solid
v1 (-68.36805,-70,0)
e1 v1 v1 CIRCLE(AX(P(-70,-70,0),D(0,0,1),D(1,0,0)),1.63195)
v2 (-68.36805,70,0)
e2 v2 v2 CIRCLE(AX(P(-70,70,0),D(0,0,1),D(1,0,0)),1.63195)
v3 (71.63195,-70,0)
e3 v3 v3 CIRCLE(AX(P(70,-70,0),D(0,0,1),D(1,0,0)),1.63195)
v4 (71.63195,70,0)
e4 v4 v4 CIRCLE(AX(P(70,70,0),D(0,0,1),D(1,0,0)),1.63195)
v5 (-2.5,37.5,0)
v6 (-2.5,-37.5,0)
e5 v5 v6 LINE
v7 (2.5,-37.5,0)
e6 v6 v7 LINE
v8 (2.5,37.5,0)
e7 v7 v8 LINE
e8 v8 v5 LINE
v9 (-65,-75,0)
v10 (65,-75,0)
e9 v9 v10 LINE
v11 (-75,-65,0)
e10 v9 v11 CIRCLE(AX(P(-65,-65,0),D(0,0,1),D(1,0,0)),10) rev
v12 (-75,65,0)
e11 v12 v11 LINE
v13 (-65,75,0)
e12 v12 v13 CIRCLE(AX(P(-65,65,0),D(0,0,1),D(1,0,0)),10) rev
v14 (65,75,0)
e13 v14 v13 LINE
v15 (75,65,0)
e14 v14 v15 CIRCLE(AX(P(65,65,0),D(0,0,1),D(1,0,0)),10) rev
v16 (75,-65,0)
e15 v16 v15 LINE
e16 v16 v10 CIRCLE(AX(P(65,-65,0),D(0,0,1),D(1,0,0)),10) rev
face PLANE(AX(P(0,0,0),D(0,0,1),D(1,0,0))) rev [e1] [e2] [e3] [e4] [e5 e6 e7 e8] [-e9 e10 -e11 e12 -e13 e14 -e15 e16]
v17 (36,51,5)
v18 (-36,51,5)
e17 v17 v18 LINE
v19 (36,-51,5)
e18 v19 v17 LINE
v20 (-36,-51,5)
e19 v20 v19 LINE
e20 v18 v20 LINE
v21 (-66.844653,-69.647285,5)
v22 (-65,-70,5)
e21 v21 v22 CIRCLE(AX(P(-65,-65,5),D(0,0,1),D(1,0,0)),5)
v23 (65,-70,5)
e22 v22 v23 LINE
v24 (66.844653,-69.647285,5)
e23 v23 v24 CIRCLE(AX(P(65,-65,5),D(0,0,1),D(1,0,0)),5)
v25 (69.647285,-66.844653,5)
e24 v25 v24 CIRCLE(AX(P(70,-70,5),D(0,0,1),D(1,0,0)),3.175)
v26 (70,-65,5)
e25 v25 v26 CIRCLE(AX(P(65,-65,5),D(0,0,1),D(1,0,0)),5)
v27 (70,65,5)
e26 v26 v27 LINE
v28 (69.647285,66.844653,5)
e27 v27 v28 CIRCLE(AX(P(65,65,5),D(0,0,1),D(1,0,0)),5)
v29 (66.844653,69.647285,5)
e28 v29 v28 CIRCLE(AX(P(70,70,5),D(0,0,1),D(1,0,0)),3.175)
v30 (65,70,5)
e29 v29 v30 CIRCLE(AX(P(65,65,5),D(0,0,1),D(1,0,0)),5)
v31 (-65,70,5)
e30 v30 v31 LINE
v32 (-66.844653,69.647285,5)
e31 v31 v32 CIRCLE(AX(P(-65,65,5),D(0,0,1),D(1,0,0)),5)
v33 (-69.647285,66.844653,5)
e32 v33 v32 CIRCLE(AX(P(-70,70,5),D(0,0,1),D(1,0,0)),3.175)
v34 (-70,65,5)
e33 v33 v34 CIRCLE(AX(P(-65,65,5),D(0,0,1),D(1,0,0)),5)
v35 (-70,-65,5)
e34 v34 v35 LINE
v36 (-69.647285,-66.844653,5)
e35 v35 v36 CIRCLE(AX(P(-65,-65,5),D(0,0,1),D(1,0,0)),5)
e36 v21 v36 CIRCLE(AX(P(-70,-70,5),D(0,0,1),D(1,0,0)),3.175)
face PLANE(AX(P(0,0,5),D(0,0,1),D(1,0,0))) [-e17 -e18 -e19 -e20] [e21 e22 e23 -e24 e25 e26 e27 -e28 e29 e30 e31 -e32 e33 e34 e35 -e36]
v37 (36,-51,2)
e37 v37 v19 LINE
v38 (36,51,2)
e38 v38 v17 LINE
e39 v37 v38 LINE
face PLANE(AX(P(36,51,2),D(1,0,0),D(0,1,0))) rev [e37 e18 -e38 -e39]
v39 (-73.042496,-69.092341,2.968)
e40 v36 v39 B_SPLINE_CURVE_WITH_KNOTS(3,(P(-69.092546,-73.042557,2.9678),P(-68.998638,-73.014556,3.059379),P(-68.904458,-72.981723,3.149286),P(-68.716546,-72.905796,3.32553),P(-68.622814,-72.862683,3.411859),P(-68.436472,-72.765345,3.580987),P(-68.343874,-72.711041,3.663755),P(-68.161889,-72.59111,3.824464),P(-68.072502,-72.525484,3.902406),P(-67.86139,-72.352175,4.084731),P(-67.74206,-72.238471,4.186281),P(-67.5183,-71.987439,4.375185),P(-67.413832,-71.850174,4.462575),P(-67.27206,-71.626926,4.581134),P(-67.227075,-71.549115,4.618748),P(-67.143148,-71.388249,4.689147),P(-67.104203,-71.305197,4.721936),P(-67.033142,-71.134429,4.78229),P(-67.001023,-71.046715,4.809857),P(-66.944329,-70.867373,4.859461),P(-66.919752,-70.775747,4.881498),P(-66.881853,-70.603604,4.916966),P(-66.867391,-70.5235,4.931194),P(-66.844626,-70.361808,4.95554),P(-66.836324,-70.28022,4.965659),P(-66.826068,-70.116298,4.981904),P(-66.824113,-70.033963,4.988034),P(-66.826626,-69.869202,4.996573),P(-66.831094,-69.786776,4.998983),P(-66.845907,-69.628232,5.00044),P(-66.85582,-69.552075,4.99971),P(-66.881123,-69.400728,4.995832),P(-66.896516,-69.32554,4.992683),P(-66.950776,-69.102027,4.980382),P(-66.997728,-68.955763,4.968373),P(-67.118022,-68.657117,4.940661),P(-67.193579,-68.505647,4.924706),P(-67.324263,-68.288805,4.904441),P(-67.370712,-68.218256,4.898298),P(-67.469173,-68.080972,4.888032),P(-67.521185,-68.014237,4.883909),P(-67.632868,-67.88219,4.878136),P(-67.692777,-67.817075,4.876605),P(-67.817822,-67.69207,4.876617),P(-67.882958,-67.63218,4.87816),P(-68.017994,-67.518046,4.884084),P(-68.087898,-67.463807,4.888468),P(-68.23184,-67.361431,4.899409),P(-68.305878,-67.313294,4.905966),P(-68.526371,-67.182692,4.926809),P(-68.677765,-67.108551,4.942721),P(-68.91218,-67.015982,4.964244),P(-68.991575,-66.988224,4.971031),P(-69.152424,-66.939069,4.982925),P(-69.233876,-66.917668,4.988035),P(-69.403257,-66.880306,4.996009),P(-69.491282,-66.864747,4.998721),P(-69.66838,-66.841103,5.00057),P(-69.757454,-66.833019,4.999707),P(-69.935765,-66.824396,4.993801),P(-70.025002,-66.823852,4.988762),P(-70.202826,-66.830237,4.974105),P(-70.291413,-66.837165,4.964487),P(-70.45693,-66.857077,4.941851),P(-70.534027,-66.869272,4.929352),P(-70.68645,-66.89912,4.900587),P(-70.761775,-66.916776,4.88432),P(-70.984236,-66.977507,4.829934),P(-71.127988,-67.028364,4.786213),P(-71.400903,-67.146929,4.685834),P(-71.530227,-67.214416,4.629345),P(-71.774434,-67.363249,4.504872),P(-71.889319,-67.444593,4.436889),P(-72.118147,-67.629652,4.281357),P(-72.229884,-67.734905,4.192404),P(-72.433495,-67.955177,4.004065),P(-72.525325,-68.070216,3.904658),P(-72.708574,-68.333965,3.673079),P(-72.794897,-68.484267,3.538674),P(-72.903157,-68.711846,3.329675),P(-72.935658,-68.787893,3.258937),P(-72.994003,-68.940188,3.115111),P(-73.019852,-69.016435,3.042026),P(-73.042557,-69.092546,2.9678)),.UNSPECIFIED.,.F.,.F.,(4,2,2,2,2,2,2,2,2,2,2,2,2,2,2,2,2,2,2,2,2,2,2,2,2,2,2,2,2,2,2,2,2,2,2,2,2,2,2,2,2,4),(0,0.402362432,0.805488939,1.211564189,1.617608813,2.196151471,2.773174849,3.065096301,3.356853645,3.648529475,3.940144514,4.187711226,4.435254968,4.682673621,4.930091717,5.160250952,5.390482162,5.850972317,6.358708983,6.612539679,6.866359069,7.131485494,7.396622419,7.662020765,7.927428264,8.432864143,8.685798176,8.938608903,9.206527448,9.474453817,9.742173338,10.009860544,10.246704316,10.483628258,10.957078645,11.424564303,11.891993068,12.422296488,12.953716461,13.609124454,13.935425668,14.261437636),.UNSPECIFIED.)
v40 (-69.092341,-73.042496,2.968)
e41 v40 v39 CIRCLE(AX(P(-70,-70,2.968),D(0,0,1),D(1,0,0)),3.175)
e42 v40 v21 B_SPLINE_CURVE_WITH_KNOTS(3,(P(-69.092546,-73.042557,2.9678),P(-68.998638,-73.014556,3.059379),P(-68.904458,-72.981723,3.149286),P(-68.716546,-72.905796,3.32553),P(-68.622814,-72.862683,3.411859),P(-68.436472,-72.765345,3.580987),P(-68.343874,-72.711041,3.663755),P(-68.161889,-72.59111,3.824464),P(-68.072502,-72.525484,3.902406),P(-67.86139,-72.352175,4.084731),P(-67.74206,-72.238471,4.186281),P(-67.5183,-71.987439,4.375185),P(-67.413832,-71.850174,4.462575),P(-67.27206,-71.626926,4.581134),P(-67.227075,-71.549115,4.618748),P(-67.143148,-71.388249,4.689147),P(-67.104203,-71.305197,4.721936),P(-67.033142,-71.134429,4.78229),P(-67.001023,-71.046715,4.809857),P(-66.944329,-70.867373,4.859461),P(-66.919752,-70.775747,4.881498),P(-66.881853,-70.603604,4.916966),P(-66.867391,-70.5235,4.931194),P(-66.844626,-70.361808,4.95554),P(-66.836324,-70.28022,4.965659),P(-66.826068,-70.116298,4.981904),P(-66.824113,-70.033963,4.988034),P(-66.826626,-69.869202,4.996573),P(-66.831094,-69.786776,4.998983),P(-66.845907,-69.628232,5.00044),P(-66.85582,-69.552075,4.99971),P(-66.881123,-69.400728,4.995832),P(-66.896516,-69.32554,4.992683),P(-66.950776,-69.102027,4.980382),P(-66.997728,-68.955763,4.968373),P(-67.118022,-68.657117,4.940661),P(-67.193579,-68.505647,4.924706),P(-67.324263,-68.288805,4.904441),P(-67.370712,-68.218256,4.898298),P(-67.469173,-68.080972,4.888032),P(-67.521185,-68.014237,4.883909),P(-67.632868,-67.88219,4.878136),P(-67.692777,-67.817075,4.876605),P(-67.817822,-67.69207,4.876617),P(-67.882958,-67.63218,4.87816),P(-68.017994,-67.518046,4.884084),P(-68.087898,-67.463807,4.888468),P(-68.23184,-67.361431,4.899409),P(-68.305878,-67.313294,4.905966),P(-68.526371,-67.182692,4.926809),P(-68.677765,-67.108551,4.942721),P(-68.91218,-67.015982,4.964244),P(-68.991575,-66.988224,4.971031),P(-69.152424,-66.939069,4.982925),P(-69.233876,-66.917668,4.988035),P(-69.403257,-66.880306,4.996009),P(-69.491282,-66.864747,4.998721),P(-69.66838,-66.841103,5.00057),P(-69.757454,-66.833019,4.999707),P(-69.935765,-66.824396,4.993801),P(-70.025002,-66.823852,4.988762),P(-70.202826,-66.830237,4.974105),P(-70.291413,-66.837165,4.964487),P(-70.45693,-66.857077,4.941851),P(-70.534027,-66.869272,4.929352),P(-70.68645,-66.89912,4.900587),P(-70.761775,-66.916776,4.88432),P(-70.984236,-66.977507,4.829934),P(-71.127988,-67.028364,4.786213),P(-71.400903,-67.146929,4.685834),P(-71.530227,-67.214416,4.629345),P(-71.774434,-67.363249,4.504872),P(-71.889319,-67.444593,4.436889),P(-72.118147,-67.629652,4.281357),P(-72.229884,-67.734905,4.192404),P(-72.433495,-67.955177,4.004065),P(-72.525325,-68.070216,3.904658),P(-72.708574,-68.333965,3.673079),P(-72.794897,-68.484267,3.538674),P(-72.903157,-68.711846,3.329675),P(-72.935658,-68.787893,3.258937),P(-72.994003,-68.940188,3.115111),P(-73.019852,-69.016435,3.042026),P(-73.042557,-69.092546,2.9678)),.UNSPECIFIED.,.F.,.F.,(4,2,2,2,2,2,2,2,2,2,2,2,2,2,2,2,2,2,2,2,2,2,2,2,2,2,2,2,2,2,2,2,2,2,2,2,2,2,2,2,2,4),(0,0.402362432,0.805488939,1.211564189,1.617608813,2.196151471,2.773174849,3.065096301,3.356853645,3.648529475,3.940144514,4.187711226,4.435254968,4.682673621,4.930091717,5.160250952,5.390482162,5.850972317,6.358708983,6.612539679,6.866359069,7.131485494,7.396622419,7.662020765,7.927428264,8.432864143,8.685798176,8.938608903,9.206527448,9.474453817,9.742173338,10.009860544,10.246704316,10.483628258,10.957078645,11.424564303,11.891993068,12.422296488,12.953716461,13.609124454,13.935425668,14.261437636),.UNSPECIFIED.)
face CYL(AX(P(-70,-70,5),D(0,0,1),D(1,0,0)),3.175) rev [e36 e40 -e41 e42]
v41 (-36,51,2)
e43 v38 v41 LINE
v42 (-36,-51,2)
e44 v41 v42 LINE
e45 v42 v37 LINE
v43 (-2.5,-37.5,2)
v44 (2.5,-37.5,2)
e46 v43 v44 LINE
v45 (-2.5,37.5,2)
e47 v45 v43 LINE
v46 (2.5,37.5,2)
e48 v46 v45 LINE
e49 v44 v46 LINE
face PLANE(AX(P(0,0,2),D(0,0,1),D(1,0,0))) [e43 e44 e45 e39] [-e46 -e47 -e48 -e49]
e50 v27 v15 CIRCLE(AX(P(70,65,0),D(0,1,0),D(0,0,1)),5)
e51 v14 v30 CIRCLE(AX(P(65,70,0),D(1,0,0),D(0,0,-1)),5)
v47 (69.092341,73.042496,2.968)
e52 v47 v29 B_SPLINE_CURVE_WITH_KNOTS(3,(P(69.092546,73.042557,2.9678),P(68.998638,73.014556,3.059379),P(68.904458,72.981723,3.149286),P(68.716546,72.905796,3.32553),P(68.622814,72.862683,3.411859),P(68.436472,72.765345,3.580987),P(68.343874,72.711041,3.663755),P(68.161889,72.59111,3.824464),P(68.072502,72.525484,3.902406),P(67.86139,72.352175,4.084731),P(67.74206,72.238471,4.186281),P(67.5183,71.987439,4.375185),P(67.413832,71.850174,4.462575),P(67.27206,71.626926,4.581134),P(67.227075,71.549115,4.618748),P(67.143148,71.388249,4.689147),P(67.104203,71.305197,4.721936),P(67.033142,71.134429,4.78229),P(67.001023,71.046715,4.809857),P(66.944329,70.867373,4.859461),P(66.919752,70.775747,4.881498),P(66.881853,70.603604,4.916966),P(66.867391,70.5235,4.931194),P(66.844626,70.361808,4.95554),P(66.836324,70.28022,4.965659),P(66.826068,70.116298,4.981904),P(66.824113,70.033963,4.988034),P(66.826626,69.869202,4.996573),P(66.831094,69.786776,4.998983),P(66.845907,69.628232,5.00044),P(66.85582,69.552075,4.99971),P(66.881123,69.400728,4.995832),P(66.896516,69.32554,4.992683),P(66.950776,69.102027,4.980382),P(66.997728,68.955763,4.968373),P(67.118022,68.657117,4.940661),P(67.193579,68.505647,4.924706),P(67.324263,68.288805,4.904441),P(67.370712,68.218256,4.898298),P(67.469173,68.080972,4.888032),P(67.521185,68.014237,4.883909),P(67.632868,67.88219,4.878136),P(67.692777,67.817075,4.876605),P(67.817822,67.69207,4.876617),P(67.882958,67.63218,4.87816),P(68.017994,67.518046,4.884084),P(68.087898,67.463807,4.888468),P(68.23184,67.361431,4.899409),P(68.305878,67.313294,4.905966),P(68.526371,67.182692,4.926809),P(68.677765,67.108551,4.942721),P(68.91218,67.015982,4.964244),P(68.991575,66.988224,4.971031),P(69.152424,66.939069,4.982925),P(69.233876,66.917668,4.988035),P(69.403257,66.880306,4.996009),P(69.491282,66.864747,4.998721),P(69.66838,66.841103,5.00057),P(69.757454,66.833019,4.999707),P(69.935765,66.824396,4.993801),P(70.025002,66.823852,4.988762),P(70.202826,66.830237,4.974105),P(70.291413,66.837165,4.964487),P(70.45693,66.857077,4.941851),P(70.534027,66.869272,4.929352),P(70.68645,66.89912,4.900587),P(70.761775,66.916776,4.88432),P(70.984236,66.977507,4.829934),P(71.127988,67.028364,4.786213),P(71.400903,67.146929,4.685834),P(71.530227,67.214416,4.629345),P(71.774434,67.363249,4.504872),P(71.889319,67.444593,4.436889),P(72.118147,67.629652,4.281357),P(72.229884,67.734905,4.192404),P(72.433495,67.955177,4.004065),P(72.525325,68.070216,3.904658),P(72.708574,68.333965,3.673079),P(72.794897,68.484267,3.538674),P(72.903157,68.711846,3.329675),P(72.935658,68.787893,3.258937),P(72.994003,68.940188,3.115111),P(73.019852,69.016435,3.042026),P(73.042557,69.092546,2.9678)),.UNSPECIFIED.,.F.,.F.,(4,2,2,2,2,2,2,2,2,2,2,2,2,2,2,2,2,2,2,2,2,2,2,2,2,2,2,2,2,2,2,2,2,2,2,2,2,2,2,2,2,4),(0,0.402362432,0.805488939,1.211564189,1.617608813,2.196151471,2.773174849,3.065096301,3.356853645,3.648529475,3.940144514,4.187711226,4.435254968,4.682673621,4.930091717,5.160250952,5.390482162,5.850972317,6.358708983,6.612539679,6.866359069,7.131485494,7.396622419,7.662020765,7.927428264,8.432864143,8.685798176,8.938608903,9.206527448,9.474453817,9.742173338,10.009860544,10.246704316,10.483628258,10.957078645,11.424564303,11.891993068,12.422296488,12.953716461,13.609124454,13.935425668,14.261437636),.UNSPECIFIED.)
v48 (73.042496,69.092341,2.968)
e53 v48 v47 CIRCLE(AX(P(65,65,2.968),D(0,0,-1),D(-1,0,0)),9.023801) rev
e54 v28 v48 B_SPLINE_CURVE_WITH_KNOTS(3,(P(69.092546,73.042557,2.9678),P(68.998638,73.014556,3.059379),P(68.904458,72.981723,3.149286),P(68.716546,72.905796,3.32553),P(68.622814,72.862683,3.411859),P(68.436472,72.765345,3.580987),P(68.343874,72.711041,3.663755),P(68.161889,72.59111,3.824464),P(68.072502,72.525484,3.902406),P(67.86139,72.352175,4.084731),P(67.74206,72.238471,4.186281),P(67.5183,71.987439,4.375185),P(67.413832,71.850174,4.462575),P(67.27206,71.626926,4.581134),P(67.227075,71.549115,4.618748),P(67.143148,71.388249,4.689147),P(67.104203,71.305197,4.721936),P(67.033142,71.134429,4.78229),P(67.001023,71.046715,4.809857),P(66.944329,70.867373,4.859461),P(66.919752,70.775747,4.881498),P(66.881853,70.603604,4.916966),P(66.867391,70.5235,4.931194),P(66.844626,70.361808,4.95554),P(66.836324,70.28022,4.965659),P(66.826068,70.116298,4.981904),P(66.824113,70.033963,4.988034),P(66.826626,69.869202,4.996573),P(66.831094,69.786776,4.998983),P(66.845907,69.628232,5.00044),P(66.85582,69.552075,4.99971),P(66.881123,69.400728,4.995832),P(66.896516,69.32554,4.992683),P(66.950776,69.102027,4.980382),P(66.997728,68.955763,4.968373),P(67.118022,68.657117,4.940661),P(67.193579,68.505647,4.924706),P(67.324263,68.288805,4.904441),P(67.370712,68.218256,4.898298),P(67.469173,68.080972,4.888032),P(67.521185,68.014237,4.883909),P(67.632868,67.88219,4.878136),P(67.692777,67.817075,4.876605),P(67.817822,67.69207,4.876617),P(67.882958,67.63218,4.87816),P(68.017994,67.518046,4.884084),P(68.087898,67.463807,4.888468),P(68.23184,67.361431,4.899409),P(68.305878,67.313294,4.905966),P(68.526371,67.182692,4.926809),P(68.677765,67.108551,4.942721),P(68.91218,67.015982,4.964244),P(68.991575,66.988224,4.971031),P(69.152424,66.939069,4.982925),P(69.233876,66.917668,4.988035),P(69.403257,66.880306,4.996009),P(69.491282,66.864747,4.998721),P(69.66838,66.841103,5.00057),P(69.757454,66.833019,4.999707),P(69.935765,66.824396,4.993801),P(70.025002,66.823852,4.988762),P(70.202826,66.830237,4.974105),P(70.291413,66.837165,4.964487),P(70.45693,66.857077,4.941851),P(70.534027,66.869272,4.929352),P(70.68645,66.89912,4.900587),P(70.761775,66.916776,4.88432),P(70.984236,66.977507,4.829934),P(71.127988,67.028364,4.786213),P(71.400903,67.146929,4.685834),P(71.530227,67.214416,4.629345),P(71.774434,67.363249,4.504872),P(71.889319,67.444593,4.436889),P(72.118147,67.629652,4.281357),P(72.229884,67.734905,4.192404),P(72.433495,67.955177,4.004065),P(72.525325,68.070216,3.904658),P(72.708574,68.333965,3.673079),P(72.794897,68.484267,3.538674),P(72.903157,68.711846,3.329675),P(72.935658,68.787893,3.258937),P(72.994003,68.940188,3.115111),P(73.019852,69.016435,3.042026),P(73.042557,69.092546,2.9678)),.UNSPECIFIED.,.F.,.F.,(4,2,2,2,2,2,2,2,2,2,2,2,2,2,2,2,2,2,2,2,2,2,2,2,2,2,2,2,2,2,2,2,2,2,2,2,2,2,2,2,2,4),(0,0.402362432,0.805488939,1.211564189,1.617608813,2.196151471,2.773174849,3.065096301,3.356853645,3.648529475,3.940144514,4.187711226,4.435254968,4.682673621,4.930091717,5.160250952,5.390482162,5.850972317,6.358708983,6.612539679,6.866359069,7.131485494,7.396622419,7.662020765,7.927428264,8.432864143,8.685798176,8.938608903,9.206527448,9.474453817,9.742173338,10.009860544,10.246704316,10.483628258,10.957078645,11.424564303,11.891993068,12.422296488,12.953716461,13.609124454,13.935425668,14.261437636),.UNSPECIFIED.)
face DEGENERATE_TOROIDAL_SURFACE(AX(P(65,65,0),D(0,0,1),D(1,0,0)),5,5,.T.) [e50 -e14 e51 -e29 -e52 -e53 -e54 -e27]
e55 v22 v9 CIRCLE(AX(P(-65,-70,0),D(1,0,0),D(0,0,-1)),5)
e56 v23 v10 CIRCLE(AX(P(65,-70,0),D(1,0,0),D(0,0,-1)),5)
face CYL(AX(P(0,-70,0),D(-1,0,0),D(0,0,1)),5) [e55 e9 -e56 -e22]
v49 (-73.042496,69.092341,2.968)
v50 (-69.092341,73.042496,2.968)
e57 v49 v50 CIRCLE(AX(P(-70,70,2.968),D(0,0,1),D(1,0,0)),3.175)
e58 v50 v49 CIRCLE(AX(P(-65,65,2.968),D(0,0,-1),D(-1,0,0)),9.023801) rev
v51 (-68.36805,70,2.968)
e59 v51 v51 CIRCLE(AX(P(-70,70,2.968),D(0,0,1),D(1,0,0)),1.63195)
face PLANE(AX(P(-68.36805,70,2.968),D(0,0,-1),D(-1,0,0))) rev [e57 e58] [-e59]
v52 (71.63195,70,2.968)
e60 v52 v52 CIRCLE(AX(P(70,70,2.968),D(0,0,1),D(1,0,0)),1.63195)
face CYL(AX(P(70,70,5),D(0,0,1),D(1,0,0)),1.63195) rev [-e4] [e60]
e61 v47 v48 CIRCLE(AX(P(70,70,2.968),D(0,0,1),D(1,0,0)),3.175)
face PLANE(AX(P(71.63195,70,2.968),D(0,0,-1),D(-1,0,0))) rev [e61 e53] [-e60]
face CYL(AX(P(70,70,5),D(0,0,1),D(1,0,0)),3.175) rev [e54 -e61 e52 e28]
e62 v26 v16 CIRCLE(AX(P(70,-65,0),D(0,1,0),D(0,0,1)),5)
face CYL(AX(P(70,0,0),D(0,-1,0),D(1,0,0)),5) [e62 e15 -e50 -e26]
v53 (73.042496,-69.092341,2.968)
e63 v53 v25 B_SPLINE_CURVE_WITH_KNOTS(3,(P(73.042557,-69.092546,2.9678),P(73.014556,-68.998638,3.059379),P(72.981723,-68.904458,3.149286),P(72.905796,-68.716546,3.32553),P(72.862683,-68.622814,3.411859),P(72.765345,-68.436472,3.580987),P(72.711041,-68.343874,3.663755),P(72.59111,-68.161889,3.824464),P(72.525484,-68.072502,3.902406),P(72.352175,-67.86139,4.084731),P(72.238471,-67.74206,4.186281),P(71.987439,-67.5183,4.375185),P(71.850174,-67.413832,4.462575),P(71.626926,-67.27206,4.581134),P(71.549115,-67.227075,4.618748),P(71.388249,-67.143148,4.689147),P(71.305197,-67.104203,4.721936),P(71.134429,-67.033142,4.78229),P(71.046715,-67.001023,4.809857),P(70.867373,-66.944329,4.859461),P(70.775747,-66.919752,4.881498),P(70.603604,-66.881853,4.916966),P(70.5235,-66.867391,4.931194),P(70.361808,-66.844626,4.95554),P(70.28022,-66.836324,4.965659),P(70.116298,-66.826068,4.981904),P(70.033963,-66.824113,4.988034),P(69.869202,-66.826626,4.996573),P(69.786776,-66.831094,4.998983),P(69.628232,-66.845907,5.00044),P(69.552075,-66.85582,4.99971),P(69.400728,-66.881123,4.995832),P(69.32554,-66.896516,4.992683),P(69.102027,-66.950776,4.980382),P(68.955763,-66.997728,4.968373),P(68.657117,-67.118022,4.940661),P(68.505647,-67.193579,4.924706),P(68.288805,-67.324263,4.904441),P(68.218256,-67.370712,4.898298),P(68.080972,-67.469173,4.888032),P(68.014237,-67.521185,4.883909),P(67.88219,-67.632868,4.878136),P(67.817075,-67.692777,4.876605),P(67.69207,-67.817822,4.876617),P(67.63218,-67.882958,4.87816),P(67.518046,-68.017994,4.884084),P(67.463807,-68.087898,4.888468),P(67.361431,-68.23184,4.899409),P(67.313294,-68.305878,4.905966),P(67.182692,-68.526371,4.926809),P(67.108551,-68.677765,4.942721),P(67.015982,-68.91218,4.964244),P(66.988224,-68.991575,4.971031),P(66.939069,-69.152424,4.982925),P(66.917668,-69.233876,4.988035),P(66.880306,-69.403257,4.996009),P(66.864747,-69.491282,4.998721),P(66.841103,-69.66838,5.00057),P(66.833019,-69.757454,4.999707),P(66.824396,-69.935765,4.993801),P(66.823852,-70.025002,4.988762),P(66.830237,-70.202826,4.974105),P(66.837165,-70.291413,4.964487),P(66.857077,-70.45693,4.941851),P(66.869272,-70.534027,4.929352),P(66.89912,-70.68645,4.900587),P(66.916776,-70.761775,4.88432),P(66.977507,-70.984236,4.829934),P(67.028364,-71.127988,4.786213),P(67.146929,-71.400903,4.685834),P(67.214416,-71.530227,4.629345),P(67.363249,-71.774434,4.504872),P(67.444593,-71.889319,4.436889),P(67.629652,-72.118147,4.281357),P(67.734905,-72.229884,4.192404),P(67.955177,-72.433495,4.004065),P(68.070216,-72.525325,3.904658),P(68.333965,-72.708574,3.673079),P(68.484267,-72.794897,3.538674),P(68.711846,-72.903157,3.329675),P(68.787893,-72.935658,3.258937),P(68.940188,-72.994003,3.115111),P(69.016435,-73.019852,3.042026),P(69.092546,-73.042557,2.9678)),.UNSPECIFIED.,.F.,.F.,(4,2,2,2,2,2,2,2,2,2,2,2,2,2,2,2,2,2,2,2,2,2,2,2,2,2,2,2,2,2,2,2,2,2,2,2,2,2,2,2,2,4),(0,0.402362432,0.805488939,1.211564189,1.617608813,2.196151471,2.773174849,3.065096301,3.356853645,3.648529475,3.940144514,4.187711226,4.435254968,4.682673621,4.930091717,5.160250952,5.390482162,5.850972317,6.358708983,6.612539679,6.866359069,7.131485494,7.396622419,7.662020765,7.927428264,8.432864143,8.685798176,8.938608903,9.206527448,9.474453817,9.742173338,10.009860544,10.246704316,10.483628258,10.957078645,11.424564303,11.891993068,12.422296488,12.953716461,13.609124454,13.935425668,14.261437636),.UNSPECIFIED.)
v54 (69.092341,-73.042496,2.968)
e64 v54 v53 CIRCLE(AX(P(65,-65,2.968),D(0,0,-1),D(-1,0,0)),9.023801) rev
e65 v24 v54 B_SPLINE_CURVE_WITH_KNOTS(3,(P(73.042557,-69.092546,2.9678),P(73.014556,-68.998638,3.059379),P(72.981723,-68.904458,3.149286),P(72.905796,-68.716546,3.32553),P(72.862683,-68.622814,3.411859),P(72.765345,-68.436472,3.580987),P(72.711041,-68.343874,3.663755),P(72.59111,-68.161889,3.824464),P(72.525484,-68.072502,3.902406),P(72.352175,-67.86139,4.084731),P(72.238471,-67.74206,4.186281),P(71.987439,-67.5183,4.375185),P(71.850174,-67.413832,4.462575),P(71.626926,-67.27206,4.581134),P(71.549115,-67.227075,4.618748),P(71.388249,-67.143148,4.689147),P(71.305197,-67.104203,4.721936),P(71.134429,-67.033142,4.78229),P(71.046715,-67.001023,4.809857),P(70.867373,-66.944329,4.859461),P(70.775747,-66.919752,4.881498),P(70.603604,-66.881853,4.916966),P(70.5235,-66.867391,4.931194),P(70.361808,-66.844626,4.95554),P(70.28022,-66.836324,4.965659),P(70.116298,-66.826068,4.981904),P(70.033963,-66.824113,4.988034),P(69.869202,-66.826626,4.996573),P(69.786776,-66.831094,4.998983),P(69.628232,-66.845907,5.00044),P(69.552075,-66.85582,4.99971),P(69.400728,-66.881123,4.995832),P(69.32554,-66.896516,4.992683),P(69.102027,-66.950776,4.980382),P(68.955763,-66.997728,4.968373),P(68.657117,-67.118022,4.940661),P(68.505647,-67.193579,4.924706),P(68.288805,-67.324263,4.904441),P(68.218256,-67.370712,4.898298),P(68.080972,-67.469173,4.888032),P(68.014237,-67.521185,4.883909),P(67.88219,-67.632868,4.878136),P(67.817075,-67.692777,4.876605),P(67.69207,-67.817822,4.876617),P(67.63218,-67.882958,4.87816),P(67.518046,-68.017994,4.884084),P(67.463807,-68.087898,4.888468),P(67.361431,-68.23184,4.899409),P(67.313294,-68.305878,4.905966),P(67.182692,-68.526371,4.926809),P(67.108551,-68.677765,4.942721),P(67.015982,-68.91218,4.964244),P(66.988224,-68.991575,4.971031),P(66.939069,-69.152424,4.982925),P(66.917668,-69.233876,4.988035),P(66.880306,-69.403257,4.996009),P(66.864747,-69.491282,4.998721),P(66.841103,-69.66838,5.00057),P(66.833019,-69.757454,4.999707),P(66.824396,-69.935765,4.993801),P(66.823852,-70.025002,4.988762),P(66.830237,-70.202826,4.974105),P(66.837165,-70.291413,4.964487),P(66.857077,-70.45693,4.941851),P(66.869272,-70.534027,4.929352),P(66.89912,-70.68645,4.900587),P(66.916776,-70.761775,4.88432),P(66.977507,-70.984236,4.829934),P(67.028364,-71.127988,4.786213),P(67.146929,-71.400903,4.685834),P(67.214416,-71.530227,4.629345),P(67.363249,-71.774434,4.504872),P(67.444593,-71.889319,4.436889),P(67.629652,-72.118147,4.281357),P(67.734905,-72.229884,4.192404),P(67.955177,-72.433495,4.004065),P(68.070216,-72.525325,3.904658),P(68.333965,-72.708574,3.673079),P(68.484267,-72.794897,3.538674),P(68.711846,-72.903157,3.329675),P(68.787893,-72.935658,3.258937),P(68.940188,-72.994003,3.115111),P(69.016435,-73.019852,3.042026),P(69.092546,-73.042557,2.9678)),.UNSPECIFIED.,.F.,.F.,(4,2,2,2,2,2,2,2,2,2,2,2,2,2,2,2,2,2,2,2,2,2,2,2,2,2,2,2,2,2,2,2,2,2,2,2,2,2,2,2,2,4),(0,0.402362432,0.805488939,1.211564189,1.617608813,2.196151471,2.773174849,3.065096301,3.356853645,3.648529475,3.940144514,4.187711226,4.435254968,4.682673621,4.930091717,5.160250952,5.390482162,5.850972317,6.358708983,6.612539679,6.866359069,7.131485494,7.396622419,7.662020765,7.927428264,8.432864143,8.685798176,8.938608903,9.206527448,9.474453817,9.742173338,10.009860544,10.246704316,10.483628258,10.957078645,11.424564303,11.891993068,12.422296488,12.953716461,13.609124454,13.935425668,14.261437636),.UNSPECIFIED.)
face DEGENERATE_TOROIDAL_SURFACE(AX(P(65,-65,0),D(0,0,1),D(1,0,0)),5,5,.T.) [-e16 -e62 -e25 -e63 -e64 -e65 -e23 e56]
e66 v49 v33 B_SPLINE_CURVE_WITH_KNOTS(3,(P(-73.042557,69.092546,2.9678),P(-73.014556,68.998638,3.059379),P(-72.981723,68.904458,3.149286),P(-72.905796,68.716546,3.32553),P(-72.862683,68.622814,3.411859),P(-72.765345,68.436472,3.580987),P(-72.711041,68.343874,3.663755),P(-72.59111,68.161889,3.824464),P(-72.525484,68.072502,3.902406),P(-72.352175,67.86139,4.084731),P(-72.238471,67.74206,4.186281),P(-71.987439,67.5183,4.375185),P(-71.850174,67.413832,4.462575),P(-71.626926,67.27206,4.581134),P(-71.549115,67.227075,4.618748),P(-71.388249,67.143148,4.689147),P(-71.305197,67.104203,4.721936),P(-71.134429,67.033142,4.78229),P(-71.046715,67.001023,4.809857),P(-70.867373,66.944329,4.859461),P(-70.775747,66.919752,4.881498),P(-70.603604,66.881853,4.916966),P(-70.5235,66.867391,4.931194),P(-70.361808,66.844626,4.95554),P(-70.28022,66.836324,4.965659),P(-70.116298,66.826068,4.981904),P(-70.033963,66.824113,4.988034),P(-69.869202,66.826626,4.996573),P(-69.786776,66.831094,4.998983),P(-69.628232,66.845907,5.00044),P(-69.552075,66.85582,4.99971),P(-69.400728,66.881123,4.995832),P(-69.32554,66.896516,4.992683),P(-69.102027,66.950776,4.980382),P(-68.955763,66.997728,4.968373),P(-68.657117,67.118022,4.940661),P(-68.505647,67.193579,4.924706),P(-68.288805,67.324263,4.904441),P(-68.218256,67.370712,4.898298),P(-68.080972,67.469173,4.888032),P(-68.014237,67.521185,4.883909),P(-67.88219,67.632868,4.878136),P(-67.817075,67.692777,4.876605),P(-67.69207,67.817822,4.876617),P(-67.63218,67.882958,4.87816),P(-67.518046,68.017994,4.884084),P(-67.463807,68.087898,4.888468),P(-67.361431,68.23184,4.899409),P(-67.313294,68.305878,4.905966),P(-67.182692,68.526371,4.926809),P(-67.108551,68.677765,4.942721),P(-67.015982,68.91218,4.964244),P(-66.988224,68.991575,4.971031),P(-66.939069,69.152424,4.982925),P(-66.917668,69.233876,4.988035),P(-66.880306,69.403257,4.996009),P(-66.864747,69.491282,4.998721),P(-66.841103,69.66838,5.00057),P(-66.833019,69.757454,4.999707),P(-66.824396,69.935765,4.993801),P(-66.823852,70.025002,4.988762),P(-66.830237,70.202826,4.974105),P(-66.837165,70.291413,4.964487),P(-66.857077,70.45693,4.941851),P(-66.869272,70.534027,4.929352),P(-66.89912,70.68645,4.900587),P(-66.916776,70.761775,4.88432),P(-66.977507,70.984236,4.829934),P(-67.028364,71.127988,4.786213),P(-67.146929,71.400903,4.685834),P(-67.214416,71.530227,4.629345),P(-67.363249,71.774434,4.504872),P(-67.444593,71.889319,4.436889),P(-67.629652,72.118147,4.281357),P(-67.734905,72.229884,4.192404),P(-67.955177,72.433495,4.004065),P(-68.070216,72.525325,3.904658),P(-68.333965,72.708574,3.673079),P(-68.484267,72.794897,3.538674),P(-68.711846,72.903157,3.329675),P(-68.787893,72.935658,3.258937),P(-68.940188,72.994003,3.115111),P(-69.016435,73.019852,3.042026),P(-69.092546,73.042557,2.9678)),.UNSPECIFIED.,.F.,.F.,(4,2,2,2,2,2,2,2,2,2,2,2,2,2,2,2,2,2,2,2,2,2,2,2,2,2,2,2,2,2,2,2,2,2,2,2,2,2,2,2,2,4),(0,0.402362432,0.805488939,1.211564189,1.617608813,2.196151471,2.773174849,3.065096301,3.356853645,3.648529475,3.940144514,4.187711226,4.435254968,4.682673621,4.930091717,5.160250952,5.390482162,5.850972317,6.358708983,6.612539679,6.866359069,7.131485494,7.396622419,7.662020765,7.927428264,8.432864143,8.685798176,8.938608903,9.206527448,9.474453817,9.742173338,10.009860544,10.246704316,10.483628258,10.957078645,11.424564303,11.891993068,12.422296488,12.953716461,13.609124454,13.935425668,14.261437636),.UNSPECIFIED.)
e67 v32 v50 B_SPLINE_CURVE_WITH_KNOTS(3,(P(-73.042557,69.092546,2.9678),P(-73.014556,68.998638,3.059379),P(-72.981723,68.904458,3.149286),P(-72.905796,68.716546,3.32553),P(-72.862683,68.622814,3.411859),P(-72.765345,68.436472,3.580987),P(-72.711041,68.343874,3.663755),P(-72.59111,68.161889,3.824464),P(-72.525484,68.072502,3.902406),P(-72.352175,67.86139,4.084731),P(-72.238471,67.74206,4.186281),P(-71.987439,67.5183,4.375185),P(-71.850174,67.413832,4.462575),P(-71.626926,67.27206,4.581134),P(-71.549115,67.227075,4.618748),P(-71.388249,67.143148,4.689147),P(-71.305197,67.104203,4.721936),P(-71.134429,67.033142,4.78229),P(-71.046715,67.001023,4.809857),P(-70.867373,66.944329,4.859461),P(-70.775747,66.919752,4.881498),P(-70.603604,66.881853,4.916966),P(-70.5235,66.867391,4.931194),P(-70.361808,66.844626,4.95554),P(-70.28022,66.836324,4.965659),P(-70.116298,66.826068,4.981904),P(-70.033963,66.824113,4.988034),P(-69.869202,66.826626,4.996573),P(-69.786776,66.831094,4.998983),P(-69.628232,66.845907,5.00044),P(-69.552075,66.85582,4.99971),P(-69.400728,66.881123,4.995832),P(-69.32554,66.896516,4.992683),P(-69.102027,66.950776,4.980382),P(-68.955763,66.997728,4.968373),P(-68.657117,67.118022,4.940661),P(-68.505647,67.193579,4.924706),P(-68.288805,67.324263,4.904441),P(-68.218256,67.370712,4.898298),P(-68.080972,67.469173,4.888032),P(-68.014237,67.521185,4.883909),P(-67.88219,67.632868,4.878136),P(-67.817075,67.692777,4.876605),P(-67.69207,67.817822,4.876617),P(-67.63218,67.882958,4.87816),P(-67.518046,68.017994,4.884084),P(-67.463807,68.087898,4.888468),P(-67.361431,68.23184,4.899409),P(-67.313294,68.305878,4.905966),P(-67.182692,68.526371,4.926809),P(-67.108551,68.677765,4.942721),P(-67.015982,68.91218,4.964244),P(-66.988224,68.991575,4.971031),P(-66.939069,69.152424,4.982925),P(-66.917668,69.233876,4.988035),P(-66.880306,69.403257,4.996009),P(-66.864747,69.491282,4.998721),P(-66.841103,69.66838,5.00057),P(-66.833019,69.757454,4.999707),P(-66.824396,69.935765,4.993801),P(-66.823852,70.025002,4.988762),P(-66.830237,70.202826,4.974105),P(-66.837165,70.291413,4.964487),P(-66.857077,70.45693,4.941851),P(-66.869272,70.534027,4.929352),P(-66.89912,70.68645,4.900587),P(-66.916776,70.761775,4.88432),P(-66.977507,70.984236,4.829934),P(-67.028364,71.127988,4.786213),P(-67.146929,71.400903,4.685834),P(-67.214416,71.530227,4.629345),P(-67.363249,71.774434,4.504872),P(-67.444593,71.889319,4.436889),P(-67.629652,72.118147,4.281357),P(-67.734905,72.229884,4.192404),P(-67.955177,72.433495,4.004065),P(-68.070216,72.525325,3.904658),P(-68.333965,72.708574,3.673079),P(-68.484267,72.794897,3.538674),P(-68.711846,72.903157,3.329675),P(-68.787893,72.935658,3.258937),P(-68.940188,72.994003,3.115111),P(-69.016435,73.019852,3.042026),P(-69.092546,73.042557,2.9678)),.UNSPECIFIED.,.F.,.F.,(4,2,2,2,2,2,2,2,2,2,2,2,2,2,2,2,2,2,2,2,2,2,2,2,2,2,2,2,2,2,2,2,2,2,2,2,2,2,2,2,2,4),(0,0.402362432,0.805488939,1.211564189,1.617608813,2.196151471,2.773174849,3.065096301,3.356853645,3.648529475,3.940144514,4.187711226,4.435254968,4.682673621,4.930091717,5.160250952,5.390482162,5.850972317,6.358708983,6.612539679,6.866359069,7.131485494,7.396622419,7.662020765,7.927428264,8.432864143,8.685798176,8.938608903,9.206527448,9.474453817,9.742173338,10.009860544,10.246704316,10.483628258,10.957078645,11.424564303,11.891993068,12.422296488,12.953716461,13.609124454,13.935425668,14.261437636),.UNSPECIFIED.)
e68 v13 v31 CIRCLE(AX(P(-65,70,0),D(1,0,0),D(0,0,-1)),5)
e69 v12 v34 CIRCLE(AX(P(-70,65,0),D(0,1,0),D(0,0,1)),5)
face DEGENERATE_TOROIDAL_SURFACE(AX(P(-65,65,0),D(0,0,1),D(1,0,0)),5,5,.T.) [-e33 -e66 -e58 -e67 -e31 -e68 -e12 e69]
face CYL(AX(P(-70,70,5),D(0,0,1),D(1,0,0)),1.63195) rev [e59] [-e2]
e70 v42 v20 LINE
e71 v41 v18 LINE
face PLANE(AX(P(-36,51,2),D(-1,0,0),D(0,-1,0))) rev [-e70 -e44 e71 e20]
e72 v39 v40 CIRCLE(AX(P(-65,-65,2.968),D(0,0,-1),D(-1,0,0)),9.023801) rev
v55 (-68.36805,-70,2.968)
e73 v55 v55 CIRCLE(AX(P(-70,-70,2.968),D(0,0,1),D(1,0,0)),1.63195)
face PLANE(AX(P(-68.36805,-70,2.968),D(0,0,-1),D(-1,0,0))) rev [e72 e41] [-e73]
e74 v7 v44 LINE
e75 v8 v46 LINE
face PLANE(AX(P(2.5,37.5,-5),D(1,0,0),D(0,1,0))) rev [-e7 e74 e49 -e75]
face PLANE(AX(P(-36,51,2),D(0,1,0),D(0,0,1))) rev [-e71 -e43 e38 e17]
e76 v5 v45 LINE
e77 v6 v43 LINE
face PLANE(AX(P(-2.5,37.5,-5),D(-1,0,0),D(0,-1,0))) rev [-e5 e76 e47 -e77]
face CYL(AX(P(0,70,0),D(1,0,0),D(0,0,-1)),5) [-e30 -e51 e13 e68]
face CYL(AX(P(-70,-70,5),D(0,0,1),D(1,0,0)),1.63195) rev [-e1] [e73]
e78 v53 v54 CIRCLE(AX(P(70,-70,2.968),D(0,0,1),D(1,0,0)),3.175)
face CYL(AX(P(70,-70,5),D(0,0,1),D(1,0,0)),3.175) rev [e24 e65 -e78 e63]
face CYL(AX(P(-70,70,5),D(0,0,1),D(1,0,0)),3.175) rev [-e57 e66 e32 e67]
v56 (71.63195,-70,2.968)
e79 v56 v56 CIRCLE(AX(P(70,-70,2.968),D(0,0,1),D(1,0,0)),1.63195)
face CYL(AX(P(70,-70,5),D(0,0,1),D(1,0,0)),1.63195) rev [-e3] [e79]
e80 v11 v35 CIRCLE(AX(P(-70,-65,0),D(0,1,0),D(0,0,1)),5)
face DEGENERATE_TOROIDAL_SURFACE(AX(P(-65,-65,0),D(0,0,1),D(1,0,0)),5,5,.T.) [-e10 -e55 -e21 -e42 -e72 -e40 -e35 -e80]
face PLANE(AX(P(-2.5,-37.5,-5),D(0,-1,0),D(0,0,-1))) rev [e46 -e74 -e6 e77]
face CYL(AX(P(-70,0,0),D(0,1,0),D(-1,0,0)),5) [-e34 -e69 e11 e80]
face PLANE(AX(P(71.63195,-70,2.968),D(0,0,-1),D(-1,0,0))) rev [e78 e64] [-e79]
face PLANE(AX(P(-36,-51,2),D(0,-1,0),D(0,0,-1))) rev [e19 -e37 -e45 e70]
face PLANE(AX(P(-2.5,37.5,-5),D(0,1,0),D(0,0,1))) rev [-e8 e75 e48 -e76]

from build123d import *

# Parameters (mm, degrees)
CROQUIS1_W                                           = 150
CROQUIS1_H                                           = 150
SALIENTE_EXTRUIR1_DEPTH                              = 5
CROQUIS2_W                                           = 72
CROQUIS2_H                                           = 102
CORTAR_EXTRUIR1_DEPTH                                = 3
CROQUIS3_W                                           = 5
CROQUIS3_H                                           = 75
CORTAR_EXTRUIR2_DEPTH                                = 10
REDONDEO1_R                                          = 10
REDONDEO3_R                                          = 5
REFRENTADO_PARA_TORNILLO_CON_CABEZA_TRON_D           = 3.2639
REFRENTADO_PARA_TORNILLO_CON_CABEZA_TRON_DEPTH       = 50
REFRENTADO_PARA_TORNILLO_CON_CABEZA_TRON_CBORE_D     = 6.35
REFRENTADO_PARA_TORNILLO_CON_CABEZA_TRON_CBORE_DEPTH = 2.032
REFRENTADO_PARA_TORNILLO_CON_CABEZA_TRON_TIP         = 0.980574487


with BuildPart() as part:
    # Croquis1 → Saliente-Extruir1 (new body)
    with BuildSketch(Plane.XY):
        Rectangle(CROQUIS1_W, CROQUIS1_H)
    extrude(amount=SALIENTE_EXTRUIR1_DEPTH)

    # Croquis2 → Cortar-Extruir1 (cut)
    with BuildSketch(Plane.XY.offset(5)):
        Rectangle(CROQUIS2_W, CROQUIS2_H)
    extrude(amount=-CORTAR_EXTRUIR1_DEPTH, mode=Mode.SUBTRACT)

    # Croquis3 → Cortar-Extruir2 (cut)
    with BuildSketch(Plane.XY.offset(5)):
        Rectangle(CROQUIS3_W, CROQUIS3_H)
    extrude(amount=-CORTAR_EXTRUIR2_DEPTH, mode=Mode.SUBTRACT)

    # Redondeo1
    redondeo1_edges = [part.edges().sort_by_distance(p)[0] for p in [
        (75, -75, 2.5),
        (-75, -75, 2.5),
        (-75, 75, 2.5),
        (75, 75, 2.5),
    ]]
    fillet(redondeo1_edges, radius=REDONDEO1_R)

    # Redondeo3
    redondeo3_edges = [part.edges().sort_by_distance(p)[0] for p in [
        (72.071067812, 72.071067812, 5),
        (75, 0, 5),
        (72.071067812, -72.071067812, 5),
        (0, -75, 5),
        (-72.071067812, -72.071067812, 5),
        (-75, 0, 5),
        (-72.071067812, 72.071067812, 5),
        (0, 75, 5),
    ]]
    fillet(redondeo3_edges, radius=REDONDEO3_R - 0.0001)  # a hair under: the kernel refuses the full size

    # Refrentado para tornillo con cabeza troncocónica de #41
    with Locations(Plane.XY.offset(5)):
        with Locations((-70, 70), (-70, -70), (70, -70), (70, 70)):
            CounterBoreHole(REFRENTADO_PARA_TORNILLO_CON_CABEZA_TRON_D / 2, REFRENTADO_PARA_TORNILLO_CON_CABEZA_TRON_CBORE_D / 2, REFRENTADO_PARA_TORNILLO_CON_CABEZA_TRON_CBORE_DEPTH, depth=REFRENTADO_PARA_TORNILLO_CON_CABEZA_TRON_DEPTH)
            with Locations((0, 0, -(REFRENTADO_PARA_TORNILLO_CON_CABEZA_TRON_DEPTH + REFRENTADO_PARA_TORNILLO_CON_CABEZA_TRON_TIP / 2))):  # 118° drill point
                Cone(0, REFRENTADO_PARA_TORNILLO_CON_CABEZA_TRON_D / 2, REFRENTADO_PARA_TORNILLO_CON_CABEZA_TRON_TIP, mode=Mode.SUBTRACT)


solid = part.part
